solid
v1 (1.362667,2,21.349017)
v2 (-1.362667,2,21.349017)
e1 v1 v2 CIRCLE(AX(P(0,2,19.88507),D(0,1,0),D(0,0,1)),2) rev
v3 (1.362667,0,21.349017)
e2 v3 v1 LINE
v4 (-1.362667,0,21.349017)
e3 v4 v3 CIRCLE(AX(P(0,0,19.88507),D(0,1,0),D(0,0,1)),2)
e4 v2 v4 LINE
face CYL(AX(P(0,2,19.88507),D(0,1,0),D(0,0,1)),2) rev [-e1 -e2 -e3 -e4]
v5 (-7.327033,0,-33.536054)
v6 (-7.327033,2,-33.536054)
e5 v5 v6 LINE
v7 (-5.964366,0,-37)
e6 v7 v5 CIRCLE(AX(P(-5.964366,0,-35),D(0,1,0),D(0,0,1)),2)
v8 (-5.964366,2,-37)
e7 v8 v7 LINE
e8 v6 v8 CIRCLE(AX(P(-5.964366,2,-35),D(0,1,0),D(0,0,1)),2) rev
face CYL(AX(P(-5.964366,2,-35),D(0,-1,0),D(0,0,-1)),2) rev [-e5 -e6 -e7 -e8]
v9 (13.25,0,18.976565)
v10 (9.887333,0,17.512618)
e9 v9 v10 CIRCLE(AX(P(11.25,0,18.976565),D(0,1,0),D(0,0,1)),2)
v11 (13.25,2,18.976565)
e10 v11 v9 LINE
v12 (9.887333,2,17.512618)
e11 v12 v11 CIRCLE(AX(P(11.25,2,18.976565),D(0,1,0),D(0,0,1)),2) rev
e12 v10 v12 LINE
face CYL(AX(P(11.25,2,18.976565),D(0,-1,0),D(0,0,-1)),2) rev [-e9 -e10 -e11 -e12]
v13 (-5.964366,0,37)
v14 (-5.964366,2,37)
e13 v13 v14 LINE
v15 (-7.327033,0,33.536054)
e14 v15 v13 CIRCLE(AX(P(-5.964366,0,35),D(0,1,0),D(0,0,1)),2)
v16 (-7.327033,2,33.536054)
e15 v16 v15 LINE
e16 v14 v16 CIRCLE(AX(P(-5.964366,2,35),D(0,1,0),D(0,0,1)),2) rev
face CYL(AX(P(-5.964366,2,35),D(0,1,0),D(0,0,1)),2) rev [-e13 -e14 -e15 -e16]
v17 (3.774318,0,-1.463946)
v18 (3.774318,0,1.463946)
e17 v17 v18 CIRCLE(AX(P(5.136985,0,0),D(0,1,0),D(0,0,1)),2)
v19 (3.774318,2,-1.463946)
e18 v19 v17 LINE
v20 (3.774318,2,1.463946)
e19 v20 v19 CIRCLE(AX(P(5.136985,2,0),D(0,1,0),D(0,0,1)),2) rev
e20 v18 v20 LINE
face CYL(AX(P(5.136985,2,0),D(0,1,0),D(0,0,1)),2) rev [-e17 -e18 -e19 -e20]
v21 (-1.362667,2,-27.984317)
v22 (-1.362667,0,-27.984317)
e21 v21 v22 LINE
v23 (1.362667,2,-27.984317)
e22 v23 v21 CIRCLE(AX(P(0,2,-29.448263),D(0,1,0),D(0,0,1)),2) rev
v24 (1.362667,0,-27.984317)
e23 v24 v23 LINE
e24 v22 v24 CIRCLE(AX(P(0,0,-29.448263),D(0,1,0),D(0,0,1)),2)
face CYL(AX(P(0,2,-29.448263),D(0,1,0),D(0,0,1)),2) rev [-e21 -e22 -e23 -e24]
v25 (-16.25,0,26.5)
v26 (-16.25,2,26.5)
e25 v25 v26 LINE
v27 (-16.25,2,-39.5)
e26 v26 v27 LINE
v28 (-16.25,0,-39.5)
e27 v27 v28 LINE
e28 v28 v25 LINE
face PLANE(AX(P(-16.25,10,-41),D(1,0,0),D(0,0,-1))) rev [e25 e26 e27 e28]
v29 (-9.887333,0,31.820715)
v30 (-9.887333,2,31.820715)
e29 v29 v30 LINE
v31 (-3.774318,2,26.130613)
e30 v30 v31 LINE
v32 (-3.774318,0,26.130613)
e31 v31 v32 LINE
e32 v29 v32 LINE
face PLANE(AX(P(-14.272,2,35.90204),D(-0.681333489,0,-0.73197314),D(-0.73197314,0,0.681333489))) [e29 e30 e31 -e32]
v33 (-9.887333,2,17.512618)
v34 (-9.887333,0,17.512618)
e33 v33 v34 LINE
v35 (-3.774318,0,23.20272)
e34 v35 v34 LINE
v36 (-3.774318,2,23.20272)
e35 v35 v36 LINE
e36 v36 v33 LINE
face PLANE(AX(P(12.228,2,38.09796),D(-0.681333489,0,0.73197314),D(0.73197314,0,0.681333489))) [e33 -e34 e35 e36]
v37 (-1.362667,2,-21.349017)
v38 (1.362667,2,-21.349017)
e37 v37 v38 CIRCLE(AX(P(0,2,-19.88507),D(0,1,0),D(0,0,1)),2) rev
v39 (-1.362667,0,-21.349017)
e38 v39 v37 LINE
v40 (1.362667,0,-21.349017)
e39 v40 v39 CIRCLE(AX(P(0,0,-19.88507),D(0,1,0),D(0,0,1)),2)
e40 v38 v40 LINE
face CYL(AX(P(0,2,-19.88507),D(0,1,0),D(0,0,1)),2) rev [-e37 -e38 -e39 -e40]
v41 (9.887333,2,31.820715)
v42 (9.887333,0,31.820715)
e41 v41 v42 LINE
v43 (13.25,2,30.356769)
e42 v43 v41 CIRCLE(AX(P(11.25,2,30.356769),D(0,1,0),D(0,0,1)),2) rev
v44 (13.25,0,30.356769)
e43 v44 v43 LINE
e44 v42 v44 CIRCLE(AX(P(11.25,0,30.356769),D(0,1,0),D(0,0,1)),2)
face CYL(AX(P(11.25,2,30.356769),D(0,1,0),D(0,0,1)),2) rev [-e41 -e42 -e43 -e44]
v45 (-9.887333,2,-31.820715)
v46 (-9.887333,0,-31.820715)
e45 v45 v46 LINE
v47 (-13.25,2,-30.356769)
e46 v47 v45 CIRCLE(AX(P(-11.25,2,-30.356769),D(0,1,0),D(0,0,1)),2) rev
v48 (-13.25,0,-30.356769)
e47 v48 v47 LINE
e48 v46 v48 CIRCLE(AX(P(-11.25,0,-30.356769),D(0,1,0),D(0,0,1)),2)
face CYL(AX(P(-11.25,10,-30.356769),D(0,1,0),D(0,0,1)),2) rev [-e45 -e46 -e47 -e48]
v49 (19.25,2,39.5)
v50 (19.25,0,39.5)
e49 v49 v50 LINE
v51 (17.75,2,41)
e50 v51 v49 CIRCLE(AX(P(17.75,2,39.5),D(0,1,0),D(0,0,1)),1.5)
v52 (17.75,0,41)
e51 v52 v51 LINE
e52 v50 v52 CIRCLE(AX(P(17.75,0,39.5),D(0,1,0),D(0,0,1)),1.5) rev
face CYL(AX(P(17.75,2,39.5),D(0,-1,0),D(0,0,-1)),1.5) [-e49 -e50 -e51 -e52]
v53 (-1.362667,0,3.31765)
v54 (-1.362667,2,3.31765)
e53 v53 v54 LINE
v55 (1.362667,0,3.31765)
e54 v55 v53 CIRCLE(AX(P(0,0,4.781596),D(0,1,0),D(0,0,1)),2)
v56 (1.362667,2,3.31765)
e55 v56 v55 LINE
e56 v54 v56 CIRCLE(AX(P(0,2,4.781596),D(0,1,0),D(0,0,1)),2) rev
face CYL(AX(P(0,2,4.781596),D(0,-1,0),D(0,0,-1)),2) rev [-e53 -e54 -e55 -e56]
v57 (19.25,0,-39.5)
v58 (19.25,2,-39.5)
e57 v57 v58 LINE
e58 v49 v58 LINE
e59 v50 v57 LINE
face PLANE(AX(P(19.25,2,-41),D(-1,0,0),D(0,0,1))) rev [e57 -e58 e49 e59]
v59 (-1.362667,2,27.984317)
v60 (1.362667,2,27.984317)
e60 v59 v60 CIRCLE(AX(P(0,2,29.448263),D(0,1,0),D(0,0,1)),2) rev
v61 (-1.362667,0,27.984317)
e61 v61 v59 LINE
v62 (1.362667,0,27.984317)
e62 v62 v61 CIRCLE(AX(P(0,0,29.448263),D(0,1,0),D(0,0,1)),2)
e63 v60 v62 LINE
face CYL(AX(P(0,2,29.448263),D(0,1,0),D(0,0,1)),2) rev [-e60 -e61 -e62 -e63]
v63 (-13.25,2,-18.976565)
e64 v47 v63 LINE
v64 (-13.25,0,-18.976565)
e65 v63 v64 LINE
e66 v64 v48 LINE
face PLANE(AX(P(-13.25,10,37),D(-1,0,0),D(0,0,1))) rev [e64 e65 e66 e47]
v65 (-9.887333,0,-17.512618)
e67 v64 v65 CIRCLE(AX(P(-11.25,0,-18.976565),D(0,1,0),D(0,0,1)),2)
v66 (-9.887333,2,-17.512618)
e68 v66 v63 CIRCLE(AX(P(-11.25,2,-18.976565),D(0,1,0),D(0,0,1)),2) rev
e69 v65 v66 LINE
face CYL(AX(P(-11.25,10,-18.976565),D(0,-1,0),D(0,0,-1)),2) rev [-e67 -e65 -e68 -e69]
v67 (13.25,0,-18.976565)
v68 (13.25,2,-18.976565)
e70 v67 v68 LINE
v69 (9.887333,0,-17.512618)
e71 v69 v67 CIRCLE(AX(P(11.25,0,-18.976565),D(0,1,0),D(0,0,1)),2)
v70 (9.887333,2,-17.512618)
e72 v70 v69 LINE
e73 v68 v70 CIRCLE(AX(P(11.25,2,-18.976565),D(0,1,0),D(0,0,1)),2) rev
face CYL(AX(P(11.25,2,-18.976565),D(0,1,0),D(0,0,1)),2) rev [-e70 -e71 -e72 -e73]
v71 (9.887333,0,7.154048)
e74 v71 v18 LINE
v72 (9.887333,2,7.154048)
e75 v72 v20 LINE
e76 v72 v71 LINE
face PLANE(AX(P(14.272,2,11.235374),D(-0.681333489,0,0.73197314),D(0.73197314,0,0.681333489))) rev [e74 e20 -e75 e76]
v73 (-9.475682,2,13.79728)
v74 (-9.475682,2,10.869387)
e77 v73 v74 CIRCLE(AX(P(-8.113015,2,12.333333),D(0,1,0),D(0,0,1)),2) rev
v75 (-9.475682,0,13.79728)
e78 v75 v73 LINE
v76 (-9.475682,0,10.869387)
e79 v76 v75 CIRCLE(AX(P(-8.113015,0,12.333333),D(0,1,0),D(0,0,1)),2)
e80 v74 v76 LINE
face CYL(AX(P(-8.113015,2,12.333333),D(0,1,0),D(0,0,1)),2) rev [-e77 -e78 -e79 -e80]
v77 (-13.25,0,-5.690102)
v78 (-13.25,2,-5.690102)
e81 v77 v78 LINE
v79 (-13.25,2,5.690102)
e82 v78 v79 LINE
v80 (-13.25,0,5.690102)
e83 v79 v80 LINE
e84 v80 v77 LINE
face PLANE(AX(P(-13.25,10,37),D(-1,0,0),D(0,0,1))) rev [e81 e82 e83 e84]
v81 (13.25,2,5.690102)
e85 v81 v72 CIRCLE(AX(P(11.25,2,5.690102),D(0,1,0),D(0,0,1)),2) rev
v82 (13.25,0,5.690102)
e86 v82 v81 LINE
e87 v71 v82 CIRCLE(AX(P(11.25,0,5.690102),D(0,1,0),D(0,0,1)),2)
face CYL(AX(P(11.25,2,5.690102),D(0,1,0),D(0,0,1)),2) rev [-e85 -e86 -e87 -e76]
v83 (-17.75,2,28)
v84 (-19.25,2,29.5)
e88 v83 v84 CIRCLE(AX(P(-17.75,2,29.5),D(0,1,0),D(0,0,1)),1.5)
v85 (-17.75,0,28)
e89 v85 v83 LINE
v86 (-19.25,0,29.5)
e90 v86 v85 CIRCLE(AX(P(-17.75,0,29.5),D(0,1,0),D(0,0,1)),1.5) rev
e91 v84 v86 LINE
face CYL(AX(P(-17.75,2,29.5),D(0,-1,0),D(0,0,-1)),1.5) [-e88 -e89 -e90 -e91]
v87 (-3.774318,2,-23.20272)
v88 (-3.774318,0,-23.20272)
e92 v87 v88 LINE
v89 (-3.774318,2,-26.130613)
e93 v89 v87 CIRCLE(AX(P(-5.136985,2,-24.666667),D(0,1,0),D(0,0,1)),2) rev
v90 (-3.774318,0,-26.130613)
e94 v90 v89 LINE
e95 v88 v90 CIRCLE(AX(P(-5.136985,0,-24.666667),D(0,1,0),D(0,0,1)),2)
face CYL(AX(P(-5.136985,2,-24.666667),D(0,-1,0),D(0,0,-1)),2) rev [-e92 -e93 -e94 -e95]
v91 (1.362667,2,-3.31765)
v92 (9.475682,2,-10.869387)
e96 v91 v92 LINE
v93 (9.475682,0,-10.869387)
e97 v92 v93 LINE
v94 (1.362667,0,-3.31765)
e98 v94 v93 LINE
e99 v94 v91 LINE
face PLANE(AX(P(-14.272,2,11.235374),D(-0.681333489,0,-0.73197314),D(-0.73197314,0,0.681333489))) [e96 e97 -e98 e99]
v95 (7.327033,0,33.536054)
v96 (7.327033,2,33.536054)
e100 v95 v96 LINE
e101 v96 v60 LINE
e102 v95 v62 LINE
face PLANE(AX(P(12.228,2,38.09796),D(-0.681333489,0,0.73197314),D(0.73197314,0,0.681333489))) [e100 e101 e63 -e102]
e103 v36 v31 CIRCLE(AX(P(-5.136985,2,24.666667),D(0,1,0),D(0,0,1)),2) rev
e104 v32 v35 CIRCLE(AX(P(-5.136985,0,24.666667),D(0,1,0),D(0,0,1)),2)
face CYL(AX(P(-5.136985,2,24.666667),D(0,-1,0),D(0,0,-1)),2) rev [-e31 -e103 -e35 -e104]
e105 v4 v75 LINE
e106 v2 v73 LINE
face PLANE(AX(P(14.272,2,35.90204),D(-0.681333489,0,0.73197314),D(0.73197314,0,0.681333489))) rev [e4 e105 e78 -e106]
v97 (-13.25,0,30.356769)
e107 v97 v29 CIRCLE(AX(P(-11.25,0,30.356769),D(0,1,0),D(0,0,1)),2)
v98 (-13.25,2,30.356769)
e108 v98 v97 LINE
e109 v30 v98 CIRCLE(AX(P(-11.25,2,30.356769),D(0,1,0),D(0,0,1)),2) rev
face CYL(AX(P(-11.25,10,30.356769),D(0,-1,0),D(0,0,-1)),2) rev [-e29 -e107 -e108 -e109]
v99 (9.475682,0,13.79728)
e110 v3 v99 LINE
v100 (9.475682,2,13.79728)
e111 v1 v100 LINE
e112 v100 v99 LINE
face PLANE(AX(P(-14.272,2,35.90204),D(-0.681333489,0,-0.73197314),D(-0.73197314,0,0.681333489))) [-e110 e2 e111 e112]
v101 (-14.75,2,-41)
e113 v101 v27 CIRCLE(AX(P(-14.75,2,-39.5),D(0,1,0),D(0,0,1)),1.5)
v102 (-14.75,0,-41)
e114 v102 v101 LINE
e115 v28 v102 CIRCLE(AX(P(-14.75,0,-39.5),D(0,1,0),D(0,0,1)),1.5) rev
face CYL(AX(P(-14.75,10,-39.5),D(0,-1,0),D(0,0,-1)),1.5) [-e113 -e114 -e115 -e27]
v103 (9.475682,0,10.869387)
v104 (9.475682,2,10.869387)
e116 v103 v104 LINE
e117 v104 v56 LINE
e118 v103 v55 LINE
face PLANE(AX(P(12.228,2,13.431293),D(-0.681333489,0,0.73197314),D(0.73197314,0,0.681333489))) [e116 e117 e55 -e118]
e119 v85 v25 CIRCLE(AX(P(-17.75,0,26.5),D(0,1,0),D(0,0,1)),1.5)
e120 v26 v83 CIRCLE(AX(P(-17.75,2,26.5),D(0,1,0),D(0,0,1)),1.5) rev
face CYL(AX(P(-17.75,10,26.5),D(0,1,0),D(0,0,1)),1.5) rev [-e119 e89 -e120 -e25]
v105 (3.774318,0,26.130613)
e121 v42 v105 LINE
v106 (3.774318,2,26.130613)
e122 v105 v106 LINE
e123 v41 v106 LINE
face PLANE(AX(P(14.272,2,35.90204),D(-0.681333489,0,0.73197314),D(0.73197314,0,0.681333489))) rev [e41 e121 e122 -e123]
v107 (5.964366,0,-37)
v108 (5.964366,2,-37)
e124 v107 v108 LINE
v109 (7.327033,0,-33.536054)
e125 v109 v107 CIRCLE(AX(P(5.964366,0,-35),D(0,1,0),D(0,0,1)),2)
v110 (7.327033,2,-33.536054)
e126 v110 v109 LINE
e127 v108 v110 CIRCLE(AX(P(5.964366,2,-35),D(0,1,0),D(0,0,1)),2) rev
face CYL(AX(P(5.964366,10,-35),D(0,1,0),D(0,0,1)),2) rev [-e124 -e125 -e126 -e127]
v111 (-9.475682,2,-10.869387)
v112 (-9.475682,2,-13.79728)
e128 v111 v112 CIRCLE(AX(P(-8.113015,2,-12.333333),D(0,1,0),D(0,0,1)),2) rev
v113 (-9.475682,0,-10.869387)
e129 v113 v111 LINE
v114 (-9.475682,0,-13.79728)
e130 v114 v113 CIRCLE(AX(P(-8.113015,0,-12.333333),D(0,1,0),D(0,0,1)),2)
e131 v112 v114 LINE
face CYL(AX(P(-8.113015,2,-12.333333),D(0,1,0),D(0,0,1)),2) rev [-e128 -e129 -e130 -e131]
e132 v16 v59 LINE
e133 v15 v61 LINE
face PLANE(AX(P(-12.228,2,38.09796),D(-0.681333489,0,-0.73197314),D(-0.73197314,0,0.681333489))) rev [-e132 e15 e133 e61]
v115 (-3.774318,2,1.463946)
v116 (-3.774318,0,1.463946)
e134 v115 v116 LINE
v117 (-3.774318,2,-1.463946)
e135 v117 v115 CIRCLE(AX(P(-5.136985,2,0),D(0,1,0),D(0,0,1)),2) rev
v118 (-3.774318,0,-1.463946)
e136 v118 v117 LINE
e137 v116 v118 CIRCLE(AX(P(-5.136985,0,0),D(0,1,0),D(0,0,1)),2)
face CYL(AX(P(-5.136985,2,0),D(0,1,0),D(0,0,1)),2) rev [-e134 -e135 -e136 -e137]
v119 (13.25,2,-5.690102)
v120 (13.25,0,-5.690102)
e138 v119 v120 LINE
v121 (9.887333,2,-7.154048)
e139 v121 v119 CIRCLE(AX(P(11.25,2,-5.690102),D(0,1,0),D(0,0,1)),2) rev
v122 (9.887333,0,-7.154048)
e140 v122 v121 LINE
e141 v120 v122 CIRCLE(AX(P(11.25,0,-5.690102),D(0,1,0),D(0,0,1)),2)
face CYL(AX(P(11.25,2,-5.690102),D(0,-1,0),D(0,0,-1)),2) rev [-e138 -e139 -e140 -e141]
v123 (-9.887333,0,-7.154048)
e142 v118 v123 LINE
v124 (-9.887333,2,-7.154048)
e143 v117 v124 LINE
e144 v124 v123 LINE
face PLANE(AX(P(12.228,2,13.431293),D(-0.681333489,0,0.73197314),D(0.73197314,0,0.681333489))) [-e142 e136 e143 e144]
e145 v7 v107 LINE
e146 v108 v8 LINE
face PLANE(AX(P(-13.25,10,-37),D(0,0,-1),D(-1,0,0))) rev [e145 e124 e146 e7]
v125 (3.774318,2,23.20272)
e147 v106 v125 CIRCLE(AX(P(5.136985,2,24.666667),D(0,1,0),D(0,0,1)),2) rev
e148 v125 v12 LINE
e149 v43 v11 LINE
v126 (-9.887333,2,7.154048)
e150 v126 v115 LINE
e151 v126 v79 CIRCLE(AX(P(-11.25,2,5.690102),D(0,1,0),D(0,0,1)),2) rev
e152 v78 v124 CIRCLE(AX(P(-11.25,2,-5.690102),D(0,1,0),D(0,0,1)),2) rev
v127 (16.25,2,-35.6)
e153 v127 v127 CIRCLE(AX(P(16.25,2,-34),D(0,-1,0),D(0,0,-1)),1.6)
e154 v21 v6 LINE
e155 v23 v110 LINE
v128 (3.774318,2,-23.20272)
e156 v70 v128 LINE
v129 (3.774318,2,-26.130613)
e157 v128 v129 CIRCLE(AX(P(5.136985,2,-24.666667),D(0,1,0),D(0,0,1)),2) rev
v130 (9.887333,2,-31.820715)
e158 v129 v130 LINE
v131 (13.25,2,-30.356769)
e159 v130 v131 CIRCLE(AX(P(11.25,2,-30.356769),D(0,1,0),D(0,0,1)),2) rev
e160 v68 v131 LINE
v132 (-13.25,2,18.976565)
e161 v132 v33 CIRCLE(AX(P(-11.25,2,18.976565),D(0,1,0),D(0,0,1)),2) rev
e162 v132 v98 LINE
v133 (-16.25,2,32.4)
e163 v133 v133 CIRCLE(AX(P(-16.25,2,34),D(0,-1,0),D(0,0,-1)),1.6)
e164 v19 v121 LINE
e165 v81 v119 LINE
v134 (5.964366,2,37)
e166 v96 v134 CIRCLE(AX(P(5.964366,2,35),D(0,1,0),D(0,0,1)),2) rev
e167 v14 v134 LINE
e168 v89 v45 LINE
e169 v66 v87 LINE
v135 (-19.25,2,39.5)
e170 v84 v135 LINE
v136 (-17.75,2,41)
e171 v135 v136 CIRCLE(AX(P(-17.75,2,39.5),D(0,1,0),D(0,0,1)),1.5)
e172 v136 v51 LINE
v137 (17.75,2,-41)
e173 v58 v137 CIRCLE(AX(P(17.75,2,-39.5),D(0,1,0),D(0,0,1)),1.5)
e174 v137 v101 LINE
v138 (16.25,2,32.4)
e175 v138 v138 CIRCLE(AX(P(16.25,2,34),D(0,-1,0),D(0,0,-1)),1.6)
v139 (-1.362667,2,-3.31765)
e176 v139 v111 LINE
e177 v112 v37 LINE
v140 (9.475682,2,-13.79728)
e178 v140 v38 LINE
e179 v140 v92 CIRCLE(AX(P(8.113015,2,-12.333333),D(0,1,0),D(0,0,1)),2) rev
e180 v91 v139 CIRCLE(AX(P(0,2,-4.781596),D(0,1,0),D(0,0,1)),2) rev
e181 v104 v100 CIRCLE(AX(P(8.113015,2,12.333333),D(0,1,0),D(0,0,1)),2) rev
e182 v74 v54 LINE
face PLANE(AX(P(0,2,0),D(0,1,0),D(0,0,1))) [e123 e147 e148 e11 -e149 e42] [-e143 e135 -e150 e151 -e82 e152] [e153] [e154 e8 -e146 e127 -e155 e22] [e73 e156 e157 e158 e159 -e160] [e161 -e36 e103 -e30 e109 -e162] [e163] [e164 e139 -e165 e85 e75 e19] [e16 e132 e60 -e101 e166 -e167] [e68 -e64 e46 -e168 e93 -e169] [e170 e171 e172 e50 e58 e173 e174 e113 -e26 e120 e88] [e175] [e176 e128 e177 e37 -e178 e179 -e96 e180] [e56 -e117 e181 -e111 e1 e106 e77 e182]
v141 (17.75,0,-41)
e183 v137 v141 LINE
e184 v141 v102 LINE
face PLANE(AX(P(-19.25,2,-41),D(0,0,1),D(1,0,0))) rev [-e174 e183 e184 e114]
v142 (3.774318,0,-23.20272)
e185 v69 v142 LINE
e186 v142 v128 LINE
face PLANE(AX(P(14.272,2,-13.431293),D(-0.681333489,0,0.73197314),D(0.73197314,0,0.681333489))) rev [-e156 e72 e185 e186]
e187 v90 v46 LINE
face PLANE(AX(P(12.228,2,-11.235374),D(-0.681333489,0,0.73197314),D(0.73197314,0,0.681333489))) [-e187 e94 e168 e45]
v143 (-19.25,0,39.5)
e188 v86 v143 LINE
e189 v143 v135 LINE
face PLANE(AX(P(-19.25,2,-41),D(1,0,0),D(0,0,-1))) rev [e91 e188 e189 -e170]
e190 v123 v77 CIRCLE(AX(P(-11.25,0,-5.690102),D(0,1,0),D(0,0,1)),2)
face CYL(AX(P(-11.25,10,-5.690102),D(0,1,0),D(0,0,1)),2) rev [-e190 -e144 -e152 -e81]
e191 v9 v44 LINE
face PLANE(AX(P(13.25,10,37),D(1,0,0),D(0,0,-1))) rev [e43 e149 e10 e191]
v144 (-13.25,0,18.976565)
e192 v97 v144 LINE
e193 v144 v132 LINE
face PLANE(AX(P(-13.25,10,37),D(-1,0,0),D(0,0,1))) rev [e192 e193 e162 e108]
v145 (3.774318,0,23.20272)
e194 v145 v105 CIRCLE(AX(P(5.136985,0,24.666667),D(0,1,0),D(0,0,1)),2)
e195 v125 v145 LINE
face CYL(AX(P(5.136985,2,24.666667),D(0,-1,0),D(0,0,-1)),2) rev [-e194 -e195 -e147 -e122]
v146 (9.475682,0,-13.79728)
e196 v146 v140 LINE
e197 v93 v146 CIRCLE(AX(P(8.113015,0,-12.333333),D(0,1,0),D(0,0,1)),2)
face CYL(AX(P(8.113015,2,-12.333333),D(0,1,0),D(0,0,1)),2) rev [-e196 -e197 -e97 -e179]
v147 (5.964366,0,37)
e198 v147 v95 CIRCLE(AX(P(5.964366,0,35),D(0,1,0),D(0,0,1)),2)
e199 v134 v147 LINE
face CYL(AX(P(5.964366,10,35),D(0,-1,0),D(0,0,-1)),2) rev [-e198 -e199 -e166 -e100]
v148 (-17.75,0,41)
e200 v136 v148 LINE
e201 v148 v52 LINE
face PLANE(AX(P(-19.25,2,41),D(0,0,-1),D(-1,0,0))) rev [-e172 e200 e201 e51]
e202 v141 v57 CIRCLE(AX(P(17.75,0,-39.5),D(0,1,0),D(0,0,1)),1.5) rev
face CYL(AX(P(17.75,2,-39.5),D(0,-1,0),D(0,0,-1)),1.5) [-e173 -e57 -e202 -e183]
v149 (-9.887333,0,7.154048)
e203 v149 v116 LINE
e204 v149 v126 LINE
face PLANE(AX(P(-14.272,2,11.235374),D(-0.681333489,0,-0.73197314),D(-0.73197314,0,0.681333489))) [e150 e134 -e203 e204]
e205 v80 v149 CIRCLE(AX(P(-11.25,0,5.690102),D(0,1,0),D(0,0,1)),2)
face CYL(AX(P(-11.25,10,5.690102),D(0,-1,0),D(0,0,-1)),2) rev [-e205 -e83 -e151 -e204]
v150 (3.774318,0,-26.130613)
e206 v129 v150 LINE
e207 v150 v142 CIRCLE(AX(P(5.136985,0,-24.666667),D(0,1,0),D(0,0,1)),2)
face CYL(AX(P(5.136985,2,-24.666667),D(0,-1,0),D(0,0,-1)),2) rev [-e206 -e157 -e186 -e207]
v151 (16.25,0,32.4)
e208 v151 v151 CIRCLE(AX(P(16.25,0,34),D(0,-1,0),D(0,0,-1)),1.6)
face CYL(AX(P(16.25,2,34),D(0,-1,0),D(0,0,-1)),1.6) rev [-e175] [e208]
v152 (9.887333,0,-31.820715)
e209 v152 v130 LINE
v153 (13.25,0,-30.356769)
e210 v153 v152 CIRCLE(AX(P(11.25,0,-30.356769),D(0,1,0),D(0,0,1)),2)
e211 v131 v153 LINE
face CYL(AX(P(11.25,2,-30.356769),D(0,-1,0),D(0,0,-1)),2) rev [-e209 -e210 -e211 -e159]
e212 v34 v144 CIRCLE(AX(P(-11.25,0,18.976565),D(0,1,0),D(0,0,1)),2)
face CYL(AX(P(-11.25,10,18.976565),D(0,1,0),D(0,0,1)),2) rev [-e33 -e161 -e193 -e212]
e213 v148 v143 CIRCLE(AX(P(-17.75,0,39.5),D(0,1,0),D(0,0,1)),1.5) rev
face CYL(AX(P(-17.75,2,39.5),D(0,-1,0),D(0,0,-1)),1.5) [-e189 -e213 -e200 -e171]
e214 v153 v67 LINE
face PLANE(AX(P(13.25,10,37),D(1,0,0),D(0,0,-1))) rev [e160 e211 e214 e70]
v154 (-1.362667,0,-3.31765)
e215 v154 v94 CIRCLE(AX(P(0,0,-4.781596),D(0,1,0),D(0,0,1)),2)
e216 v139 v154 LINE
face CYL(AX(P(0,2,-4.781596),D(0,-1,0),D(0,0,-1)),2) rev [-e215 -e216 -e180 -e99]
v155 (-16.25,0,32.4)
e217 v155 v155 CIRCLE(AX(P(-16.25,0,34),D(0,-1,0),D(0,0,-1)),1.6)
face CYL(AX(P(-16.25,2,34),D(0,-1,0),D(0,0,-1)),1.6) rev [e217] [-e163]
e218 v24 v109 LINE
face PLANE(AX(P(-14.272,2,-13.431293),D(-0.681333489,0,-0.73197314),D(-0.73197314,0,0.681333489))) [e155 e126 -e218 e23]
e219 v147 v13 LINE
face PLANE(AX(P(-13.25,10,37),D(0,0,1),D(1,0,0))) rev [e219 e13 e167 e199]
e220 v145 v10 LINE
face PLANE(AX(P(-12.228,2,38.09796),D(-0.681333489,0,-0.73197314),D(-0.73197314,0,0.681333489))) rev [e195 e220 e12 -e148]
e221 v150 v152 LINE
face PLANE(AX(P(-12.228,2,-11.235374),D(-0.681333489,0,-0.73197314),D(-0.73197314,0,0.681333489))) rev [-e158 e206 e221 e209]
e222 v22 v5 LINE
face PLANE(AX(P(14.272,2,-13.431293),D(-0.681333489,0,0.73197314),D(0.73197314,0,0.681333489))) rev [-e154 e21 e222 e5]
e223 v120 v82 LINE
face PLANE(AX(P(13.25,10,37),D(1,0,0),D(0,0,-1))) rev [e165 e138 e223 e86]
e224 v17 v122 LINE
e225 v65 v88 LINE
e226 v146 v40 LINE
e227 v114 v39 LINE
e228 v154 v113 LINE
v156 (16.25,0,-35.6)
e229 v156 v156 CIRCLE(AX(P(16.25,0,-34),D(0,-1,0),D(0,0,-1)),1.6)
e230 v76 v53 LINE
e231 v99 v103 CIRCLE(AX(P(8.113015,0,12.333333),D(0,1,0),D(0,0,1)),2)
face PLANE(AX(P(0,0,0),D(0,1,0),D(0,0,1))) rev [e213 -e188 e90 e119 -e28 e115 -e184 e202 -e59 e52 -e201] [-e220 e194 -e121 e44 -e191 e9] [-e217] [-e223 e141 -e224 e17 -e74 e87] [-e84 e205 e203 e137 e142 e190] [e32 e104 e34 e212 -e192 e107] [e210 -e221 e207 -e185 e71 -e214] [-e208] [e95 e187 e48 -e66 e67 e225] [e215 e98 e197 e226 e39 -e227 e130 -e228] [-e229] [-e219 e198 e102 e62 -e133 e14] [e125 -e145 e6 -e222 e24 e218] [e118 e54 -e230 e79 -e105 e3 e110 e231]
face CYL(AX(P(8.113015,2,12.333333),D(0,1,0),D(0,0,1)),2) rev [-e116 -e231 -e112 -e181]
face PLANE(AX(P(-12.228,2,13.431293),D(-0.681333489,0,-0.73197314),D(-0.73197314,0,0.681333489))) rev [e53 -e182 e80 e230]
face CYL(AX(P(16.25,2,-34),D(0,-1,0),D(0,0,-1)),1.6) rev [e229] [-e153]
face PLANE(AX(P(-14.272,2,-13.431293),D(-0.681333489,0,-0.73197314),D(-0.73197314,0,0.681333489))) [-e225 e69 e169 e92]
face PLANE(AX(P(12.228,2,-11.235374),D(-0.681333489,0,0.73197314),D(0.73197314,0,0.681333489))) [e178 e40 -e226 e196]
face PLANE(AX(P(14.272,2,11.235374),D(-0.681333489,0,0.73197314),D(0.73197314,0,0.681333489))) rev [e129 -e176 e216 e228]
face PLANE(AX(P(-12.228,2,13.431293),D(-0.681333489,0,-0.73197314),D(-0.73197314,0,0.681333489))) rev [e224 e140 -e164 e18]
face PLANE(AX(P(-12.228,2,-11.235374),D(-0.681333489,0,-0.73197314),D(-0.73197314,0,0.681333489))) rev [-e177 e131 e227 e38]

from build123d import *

# Parameters (mm, degrees)
SKETCH_1_W          = 38.5
SKETCH_1_H          = 82
EXTRUDE_1_DEPTH     = 2
SKETCH_2_R          = 1.6
CUT_EXTRUDE_1_DEPTH = 2
SKETCH_3_W          = 3
SKETCH_3_H          = 69
SKETCH_3_W_2        = 26.5
SKETCH_3_H_2        = 74
CUT_EXTRUDE_2_DEPTH = 10
EXTRUDE_1_2_DEPTH   = 2
FILLET_1_R          = 2
FILLET_2_R          = 1.5


with BuildPart() as part:
    # 草图1 → Extrude 1 (new body)
    with BuildSketch(Plane(origin=(0, 0, 0), x_dir=(1, 0, 0), z_dir=(0, 1, 0))):
        Rectangle(SKETCH_1_W, SKETCH_1_H)
    extrude(amount=EXTRUDE_1_DEPTH)

    # 草图2 → 切除-拉伸1 (cut)
    with BuildSketch(Plane.XZ):
        with Locations(Location((16.25, -34, 0), (0, 0, 270))):
            Circle(SKETCH_2_R)
        with Locations(Location((16.25, 34, 0), (0, 0, 270))):
            Circle(SKETCH_2_R)
        with Locations(Location((-16.25, 34, 0), (0, 0, 270))):
            Circle(SKETCH_2_R)
    extrude(amount=-CUT_EXTRUDE_1_DEPTH, mode=Mode.SUBTRACT)

    # 草图3 → 切除-拉伸2 (cut)
    with BuildSketch(Plane.XZ):
        with Locations((-17.75, -6.5)):
            Rectangle(SKETCH_3_W, SKETCH_3_H)
        Rectangle(SKETCH_3_W_2, SKETCH_3_H_2)
    extrude(amount=-CUT_EXTRUDE_2_DEPTH, mode=Mode.SUBTRACT)

    # 草图4 → Extrude 1 2 (add)
    with BuildSketch(Plane.XZ):
        Polygon((-14.272000233, 35.90204029), (11.048434944, 12.333333333), (-15.451565056, -12.333333333), (12.227999767, -38.09795971), (14.272000233, -35.90204029), (-11.048434944, -12.333333333), (15.451565056, 12.333333333), (-12.227999767, 38.09795971), align=None)
        Polygon((12.227999767, 38.09795971), (-15.451565056, 12.333333333), (11.048434944, -12.333333333), (-14.272000233, -35.90204029), (-12.227999767, -38.09795971), (15.451565056, -12.333333333), (-11.048434944, 12.333333333), (14.272000233, 35.90204029), align=None)
    extrude(amount=-EXTRUDE_1_2_DEPTH)

    # 圆角1
    fillet_1_edges = [part.edges().sort_by_distance(p)[0] for p in [
        (-2.201565056, 1, 24.666666667),
        (-2.201565056, 1, 0),
        (-2.201565056, 1, -24.666666667),
        (0, 1, 26.715922191),
        (2.201565056, 1, -24.666666667),
        (2.201565056, 1, 0),
        (2.201565056, 1, 24.666666667),
        (0, 1, -26.715922191),
        (0, 1, 2.049255524),
        (0, 1, 22.617411143),
        (11.048434944, 1, 12.333333333),
        (0, 1, -2.049255524),
        (0, 1, -22.617411143),
        (-11.048434944, 1, -12.333333333),
        (11.048434944, 1, -12.333333333),
        (-11.048434944, 1, 12.333333333),
        (-11.048434944, 1, -37),
        (11.048434944, 1, -37),
        (13.25, 1, 34.950744476),
        (13.25, 1, -10.284077809),
        (13.25, 1, -14.382588857),
        (13.25, 1, -34.950744476),
        (13.25, 1, 10.284077809),
        (13.25, 1, 14.382588857),
        (11.048434944, 1, 37),
        (-11.048434944, 1, 37),
        (-13.25, 1, -34.950744476),
        (-13.25, 1, 10.284077809),
        (-13.25, 1, 14.382588857),
        (-13.25, 1, 34.950744476),
        (-13.25, 1, -10.284077809),
        (-13.25, 1, -14.382588857),
    ]]
    fillet(fillet_1_edges, radius=FILLET_1_R)

    # 圆角2
    fillet_2_edges = [part.edges().sort_by_distance(p)[0] for p in [
        (-16.25, 1, 28),
        (19.25, 1, -41),
        (19.25, 1, 41),
        (-19.25, 1, 41),
        (-19.25, 1, 28),
        (-16.25, 1, -41),
    ]]
    fillet(fillet_2_edges, radius=FILLET_2_R - 0.0001)  # a hair under: the kernel refuses the full size


solid = part.part
